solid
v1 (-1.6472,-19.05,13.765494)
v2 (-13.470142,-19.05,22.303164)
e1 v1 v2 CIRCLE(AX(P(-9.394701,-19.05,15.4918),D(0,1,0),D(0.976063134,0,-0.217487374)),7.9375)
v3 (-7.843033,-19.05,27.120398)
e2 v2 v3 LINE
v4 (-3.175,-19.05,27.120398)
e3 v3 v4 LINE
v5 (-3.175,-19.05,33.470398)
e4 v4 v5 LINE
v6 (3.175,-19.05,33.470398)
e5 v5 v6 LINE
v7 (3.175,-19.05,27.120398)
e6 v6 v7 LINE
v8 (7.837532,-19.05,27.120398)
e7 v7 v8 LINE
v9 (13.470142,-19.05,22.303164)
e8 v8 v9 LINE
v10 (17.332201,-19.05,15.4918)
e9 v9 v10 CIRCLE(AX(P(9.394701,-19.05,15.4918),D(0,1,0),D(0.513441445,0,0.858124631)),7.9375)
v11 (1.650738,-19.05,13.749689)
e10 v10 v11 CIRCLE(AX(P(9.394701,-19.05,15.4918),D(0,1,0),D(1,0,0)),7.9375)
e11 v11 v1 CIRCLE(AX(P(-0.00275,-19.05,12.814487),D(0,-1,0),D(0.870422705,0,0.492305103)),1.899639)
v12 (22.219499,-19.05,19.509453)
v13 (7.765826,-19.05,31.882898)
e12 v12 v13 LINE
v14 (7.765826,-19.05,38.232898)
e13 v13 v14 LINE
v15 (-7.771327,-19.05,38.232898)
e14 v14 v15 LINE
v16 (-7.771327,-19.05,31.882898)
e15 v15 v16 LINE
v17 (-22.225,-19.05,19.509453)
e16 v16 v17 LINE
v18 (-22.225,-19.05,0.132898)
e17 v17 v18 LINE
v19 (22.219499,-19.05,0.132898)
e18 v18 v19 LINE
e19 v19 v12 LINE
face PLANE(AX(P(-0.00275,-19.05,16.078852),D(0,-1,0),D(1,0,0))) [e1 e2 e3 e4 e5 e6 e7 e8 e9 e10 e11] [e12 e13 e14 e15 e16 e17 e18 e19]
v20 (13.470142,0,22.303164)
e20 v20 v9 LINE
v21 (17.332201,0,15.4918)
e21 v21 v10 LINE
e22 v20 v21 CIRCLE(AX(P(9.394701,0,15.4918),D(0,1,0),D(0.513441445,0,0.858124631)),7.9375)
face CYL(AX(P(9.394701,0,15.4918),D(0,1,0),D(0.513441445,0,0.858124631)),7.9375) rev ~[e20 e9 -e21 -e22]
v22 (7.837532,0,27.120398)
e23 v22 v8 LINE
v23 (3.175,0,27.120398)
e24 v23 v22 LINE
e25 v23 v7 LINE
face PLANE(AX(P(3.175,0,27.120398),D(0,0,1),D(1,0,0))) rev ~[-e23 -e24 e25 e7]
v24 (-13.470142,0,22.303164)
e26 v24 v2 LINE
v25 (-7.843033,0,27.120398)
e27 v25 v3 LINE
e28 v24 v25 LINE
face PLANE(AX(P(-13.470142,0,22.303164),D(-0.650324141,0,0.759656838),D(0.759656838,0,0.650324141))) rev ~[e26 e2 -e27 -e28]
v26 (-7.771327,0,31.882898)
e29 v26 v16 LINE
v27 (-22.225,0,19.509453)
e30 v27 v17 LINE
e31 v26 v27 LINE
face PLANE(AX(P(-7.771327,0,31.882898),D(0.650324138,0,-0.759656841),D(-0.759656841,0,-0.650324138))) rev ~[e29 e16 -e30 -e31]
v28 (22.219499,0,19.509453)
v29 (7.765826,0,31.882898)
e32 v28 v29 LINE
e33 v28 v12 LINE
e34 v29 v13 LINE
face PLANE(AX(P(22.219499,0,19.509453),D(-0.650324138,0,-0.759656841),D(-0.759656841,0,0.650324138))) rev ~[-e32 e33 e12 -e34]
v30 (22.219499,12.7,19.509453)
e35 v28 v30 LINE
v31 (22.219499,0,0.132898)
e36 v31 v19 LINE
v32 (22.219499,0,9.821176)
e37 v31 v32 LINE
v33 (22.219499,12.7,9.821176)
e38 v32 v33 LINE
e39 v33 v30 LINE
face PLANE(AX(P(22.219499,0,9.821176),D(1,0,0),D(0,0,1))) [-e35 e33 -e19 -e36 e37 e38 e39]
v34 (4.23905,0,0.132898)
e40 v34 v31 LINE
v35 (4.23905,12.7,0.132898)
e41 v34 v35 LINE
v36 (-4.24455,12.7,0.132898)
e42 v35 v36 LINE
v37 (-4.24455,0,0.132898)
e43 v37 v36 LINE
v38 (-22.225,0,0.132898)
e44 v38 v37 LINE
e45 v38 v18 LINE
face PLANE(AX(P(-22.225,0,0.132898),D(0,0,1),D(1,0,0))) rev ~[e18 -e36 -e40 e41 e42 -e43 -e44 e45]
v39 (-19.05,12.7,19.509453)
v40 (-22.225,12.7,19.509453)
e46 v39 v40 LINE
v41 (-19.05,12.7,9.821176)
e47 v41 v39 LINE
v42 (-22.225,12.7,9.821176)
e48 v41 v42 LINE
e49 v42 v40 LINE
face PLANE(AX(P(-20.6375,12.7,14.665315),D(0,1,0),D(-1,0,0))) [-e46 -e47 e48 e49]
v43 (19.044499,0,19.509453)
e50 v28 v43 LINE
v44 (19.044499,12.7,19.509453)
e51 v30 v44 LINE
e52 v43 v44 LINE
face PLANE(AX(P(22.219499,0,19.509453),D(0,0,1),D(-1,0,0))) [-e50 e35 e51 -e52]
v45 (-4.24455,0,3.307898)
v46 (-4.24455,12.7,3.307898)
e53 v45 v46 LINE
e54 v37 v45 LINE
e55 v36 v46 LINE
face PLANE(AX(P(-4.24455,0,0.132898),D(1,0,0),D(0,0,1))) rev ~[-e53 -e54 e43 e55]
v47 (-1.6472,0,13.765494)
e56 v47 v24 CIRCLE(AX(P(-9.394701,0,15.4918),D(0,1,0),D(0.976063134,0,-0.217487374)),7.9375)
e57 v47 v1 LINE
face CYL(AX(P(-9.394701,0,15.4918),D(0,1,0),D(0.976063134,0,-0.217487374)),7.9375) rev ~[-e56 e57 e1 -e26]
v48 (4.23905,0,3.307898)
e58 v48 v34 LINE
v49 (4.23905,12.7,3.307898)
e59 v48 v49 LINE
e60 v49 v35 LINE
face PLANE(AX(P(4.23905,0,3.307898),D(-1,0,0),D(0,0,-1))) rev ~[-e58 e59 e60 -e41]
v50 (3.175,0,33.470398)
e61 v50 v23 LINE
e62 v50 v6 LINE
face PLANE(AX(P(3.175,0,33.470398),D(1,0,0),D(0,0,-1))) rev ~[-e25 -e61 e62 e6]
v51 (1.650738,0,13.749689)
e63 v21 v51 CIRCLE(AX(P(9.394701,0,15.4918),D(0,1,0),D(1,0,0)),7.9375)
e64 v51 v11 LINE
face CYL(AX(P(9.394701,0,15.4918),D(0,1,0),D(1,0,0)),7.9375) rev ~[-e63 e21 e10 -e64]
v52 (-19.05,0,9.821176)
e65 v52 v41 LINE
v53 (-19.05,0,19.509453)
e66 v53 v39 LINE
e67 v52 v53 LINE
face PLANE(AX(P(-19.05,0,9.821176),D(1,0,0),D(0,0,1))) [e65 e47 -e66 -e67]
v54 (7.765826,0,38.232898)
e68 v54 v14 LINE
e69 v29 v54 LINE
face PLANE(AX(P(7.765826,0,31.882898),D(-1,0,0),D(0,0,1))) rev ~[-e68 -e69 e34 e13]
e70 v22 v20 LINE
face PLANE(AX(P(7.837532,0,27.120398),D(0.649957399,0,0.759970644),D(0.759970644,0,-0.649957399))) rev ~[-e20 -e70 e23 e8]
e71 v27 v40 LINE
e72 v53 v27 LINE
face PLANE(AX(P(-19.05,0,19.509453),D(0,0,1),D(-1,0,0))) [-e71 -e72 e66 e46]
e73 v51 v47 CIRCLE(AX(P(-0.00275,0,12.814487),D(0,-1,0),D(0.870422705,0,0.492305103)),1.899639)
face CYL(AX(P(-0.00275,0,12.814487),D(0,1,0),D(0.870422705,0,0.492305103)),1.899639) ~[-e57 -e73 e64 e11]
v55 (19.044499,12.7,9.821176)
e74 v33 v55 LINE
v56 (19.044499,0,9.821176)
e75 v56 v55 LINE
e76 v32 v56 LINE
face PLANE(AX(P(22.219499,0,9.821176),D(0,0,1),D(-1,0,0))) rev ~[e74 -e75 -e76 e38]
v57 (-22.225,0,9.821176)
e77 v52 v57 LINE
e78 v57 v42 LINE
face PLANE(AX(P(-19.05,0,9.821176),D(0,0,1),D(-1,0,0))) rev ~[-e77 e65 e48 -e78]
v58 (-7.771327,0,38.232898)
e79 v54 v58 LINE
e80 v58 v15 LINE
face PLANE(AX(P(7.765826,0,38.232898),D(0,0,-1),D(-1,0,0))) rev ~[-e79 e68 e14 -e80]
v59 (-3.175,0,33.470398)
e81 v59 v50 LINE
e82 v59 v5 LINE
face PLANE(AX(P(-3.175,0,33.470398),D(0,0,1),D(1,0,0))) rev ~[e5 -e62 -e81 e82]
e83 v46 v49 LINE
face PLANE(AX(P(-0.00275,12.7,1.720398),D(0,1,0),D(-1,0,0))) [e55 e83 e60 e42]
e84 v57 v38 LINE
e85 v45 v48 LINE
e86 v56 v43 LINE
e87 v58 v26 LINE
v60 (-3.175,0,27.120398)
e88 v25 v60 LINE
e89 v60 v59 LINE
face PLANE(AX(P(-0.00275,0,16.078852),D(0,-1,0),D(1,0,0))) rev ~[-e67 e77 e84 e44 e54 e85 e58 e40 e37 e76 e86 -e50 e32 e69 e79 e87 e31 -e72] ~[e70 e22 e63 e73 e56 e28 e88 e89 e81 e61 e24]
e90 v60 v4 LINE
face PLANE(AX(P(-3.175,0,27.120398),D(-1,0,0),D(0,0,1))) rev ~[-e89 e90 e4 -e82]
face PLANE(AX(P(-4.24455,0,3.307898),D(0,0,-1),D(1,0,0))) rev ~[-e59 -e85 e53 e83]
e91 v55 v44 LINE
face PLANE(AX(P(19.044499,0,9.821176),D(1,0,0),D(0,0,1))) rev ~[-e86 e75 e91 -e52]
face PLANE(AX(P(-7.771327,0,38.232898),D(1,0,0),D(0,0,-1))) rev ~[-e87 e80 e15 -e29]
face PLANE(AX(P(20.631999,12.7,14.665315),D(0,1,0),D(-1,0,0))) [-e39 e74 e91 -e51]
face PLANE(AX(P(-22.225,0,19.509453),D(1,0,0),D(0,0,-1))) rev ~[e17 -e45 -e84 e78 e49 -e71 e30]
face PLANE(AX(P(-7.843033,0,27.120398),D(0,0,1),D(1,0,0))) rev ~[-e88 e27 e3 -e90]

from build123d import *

# Parameters (mm, degrees)
F1_DEPTH = 19.05
F2_W     = 3.175
F2_H     = 9.6882774726
F3_DEPTH = 12.7


# Not quite as in the source:
# - ends of sketch curves that miss each other by under 0.0002 mm in the source are joined


with BuildPart() as f1:
    # F0 (on Front) → F1 (new body)
    with BuildSketch(Plane.XZ):
        Polygon((-7.493, 0.1328983575), (0, 0.1328983575), (7.493, 0.1328983575), (22.2194990303, 0.1328983575), (22.2194990303, 19.5094533027), (7.7658264293, 31.8828983575), (7.7658264293, 38.2328983575), (-7.7713273633, 38.2328983575), (-7.7713273633, 31.8828983575), (-22.2249999642, 19.5094533027), (-22.2249999642, 4.5234533027), (-22.2249999642, 0.1328983575), align=None)
        with BuildLine():
            ThreePointArc((-1.6471995105, 13.7654938087), (-14.0416307026, 9.056743723), (-13.4701421127, 22.3031640975))
            Line((-13.4701421127, 22.3031640975), (-7.8430329322, 27.1203983575))
            Line((-7.8430329322, 27.1203983575), (-3.175, 27.1203983575))
            Line((-3.175, 27.1203983575), (-3.175, 30.2953983575))
            Line((-3.175, 30.2953983575), (-3.175, 33.4703983575))
            Line((-3.175, 33.4703983575), (3.175, 33.4703983575))
            Line((3.175, 33.4703983575), (3.175, 30.2953983575))
            Line((3.175, 30.2953983575), (3.175, 27.1203983575))
            Line((3.175, 27.1203983575), (7.8375319983, 27.1203983575))
            Line((7.8375319983, 27.1203983575), (13.4701421127, 22.3031640975))
            ThreePointArc((13.4701421127, 22.3031640975), (16.2995077669, 19.40684068), (17.3322006389, 15.4917998403))
            ThreePointArc((17.3322006389, 15.4917998403), (10.2711150187, 7.6028326022), (1.6507381924, 13.7496885133))
            ThreePointArc((1.6507381924, 13.7496885133), (0.0063534061, 14.7141035739), (-1.6471995105, 13.7654938087))
        make_face(mode=Mode.SUBTRACT)
    extrude(amount=F1_DEPTH)

    # F2 (on face) → F3 (join)
    with BuildSketch(Plane(origin=(0, 0, 0), x_dir=(-1, 0, 0), z_dir=(0, 1, 0))):
        with Locations((-20.6319990303, 14.6653145664)):
            Rectangle(F2_W, F2_H)
        with Locations((20.6374999642, 14.6653145664)):
            Rectangle(F2_W, F2_H)
        Polygon((-4.239049533, 3.3078983575), (-4.239049533, 0.1328983575), (0.002750467, 0.1328983575), (4.244550467, 0.1328983575), (4.244550467, 3.3078983575), align=None)
    extrude(amount=F3_DEPTH)


solid = f1.part
